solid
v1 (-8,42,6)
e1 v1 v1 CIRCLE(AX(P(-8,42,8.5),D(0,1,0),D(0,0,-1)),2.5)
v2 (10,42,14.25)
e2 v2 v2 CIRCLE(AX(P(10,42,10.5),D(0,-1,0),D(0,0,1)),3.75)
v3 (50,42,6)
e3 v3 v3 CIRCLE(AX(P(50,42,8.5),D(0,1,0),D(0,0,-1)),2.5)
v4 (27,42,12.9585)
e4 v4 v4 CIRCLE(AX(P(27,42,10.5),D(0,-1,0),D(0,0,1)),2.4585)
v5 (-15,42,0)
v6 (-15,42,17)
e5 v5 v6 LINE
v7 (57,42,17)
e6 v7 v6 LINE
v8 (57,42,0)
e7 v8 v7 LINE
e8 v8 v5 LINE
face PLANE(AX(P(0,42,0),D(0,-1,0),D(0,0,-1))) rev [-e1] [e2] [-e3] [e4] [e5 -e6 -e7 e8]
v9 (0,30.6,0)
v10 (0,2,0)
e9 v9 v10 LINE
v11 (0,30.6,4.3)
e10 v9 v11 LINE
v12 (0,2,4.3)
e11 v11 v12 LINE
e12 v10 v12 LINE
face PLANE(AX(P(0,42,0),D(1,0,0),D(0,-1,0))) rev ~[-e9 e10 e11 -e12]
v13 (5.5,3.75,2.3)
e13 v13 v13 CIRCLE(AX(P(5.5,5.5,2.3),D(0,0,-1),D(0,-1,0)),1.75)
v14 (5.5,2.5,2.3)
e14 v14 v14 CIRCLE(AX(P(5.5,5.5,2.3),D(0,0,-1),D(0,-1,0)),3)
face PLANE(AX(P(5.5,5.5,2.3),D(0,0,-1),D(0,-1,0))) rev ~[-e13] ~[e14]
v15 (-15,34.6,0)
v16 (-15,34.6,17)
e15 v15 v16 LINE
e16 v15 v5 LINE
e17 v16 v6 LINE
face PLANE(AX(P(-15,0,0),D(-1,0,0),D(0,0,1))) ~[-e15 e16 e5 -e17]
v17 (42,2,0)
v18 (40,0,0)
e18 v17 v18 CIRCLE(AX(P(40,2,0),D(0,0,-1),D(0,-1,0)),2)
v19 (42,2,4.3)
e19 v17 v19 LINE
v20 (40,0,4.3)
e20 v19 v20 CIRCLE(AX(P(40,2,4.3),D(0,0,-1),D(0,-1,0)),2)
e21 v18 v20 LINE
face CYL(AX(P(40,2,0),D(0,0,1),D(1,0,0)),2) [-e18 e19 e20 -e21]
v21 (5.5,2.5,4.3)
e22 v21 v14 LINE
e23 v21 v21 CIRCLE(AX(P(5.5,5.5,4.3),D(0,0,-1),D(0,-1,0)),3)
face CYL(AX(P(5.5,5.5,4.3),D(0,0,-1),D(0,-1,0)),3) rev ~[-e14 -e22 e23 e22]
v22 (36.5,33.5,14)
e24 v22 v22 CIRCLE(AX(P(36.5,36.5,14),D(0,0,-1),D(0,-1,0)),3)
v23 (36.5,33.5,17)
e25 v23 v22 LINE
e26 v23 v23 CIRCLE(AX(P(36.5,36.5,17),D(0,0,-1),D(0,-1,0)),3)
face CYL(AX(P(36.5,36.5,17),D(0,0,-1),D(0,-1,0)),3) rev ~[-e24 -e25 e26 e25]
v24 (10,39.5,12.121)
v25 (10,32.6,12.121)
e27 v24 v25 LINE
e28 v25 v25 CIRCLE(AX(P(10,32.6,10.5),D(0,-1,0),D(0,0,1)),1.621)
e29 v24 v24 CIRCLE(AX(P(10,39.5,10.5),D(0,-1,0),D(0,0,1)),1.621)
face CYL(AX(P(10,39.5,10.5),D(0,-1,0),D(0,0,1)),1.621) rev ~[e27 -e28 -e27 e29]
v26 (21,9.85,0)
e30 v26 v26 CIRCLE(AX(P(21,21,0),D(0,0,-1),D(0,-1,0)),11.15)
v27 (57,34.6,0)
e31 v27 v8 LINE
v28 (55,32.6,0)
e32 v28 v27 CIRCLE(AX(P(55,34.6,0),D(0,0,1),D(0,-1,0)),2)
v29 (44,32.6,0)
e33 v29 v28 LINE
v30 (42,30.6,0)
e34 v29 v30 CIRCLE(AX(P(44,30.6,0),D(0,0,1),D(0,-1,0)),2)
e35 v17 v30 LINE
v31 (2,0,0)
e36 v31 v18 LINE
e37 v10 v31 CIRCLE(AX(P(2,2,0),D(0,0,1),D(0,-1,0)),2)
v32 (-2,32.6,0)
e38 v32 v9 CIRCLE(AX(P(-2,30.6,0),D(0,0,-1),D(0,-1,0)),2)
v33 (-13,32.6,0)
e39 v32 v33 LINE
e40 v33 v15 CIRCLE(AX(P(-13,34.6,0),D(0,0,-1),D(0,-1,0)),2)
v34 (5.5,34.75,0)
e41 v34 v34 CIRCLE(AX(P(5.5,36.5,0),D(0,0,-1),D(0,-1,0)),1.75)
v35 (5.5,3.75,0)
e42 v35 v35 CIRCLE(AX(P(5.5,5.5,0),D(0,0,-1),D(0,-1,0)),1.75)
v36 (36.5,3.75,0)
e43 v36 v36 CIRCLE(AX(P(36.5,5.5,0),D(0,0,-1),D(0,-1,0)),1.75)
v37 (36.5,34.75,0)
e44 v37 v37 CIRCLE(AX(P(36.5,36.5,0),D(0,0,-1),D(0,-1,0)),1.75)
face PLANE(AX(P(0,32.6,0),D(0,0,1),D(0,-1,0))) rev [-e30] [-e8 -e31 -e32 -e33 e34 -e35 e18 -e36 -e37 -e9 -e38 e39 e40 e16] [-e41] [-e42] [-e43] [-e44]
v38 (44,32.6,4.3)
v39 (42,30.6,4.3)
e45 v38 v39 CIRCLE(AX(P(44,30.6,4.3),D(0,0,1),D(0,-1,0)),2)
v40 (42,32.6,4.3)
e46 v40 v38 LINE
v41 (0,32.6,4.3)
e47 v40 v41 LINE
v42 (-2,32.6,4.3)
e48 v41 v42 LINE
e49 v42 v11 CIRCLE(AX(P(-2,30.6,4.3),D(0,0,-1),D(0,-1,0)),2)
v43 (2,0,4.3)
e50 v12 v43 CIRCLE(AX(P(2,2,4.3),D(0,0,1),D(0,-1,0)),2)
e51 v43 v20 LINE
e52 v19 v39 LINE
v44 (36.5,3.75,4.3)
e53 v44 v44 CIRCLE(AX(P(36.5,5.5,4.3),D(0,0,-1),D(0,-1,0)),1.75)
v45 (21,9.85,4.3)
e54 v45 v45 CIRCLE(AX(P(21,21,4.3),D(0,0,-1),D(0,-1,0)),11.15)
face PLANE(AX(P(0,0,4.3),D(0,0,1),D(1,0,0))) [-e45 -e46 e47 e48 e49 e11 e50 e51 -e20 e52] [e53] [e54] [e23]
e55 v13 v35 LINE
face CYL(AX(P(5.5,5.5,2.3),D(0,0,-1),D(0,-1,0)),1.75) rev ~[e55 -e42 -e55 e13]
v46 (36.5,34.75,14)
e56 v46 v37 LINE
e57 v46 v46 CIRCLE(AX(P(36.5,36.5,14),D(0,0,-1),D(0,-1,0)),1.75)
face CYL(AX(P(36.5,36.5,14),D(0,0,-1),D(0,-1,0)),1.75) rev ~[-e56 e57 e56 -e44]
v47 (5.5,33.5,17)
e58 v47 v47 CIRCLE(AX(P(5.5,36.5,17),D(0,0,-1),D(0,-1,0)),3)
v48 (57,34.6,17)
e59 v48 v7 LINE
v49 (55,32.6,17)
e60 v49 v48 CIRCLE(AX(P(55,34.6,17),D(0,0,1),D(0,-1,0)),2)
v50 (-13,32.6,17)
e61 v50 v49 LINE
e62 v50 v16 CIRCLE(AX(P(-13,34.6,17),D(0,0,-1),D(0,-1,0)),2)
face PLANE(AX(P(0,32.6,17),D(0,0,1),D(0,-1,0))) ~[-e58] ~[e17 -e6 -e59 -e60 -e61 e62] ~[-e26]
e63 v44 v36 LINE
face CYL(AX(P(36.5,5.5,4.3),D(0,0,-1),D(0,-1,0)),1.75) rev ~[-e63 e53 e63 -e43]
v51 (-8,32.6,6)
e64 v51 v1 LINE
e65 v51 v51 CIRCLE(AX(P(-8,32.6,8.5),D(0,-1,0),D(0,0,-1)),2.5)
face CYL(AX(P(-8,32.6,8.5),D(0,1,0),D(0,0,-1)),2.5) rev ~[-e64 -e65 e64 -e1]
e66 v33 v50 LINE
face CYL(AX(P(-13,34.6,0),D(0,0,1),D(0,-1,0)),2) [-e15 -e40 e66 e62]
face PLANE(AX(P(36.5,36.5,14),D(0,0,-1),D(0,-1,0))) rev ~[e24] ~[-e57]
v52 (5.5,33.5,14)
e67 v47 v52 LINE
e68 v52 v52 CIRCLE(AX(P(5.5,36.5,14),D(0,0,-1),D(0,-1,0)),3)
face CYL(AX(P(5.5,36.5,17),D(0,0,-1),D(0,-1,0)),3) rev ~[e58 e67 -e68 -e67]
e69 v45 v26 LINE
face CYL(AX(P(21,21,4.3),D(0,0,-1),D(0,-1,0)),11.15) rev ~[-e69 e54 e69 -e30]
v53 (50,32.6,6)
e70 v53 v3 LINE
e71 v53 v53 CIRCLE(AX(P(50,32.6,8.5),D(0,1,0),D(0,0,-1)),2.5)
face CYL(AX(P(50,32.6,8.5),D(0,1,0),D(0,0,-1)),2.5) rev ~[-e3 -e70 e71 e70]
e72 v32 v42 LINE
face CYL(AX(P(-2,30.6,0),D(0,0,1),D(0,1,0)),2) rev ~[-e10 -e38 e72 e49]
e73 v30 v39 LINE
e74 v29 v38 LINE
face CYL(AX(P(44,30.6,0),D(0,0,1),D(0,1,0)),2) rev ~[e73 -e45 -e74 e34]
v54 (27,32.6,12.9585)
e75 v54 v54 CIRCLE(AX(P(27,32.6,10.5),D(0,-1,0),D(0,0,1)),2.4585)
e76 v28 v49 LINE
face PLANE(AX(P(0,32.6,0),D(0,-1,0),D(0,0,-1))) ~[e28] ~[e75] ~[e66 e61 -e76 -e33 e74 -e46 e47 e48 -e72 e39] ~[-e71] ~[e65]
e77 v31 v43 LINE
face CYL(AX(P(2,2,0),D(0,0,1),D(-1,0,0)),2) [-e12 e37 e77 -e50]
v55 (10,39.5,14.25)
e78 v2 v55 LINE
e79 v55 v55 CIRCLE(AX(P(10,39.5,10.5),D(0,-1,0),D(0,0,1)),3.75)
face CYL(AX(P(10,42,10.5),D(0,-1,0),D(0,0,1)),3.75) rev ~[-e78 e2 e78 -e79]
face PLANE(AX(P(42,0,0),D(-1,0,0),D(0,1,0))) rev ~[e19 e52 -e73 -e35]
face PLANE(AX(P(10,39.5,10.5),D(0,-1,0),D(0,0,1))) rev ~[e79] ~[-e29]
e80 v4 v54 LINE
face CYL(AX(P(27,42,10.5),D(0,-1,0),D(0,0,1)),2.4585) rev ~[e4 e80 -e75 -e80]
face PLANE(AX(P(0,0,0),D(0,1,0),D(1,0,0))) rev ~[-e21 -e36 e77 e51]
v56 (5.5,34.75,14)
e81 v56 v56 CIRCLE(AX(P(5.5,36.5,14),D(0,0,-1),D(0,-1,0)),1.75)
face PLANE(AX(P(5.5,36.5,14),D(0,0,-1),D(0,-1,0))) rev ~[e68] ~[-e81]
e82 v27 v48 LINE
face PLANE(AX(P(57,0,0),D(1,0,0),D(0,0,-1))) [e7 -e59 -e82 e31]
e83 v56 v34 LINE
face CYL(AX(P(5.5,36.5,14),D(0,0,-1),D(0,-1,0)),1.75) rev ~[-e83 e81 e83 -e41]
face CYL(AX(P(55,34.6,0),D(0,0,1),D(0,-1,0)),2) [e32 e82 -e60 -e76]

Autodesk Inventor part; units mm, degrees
ref_plane "YZ Plane" through (0, 0, 0) normal (1, 0, 0) x (0, 1, 0)
ref_plane "XZ Plane" through (0, 0, 0) normal (0, 1, 0) x (-1, 0, 0)
sketch "Sketch1" plane through (0, 0, 0) normal (0, 0, 1) x (1, 0, 0)
  line L0 (0, 0) -> (42, 0)
  line L1 (42, 0) -> (42, 42)
  line L2 (42, 42) -> (0, 42)
  line L3 (0, 42) -> (0, 0)
  dimension "d0" = 42
  dimension "d1" = 42
extrude "Extrusion1" add sketch "Sketch1" along normal blind 4.3
sketch "Sketch2" plane through (0, 0, 4.3) normal (0, 0, 1) x (1, 0, 0)
  line L0 (0, 42) -> (0, 0) projected
  line L1 (42, 0) -> (42, 42) projected
  line L2 (0, 42) -> (42, 42)
  line L3 (42, 42) -> (42, 32.6)
  line L4 (42, 32.6) -> (0, 32.6)
  line L5 (0, 32.6) -> (0, 42)
  dimension "d4" = 9.4
extrude "Extrusion2" add sketch "Sketch2" along normal blind 12.7
sketch "Sketch3" plane through (0, 0, 4.3) normal (0, 0, 1) x (1, 0, 0)
  line L0 (0, 32.6) -> (0, 0) projected
  line L1 (0, 0) -> (42, 0) projected
  point P0 (21, 21)
  dimension "d7" = 21
  dimension "d8" = 21
hole "Hole1" at (21, 21, 4.3) direction (0, 0, -1) diameter 22.3 end through all
sketch "Sketch4" plane through (0, 0, 17) normal (0, 0, 1) x (1, 0, 0)
  line L0 (42, 42) -> (0, 42) projected
  line L1 (0, 42) -> (0, 32.6) projected
  line L2 (42, 32.6) -> (42, 42) projected
  line L3 (0, 0) -> (42, 0) projected
  point P0 (5.5, 36.5)
  point P1 (36.5, 36.5)
  dimension "d16" = 5.5
  dimension "d17" = 5.5
  dimension "d18" = 5.5
  dimension "d21" = 5.5
hole "Hole2" at (5.5, 36.5, 17) at (36.5, 36.5, 17) direction (0, 0, -1) diameter 3.5 end through all counterbore diameter 6 counterbore depth 3
sketch "Sketch5" plane through (0, 0, 4.3) normal (0, 0, 1) x (1, 0, 0)
  line L0 (0, 0) -> (42, 0) projected
  line L1 (0, 32.6) -> (0, 0) projected
  point P0 (5.5, 5.5)
  dimension "d31" = 5.5
  dimension "d32" = 5.5
hole "Hole3" at (5.5, 5.5, 4.3) direction (0, 0, -1) diameter 3.5 end through all counterbore diameter 6 counterbore depth 2
sketch "Sketch6" plane through (0, 0, 4.3) normal (0, 0, 1) x (1, 0, 0)
  line L0 (42, 0) -> (42, 32.6) projected
  line L1 (0, 0) -> (42, 0) projected
  point P0 (36.5, 5.5)
  dimension "d40" = 5.5
  dimension "d41" = 5.5
hole "Hole4" at (36.5, 5.5, 4.3) direction (0, 0, -1) diameter 3.5 end through all
sketch "Sketch7" plane through (0, 42, 0) normal (0, 1, 0) x (1, 0, 0)
  line L0 (0, -17) -> (42, -17) projected
  line L1 (42, 0) -> (42, -17) projected
  point P0 (0, 0)
  point P1 (27, -10.5)
  dimension "d49" = 6.5
  dimension "d50" = 15
hole "Hole5" at (27, 42, 10.5) direction (0, -1, 0) diameter 4.917 end through all thread size "M6x1" class "6H" standard "ISO Metric profile"
sketch "Sketch8" plane through (0, 42, 0) normal (0, 1, 0) x (1, 0, 0)
  line L0 (42, -17) -> (0, -17) projected
  line L1 (0, -4.3) -> (0, -17) projected
  point P0 (0, 0)
  point P1 (10, -10.5)
  dimension "d58" = 6.5
  dimension "d59" = 10
hole "Hole6" at (10, 42, 10.5) direction (0, -1, 0) diameter 3.242 end through all counterbore diameter 7.5 counterbore depth 2.5 thread size "M4x0.7" class "6H" standard "ISO Metric profile"
sketch "Sketch9" plane through (42, 0, 0) normal (1, 0, 0) x (0, 0, -1)
  line L0 (-17, 32.6) -> (-17, 42) projected
  line L1 (0, 32.6) -> (-17, 32.6)
  line L2 (0, 42) -> (-17, 42) projected
  line L3 (0, 0) -> (0, 42)
extrude "Extrusion3" add sketch "Sketch9" along normal blind 15
sketch "Sketch10" plane through (0, 32.6, 4.3) normal (0, -1, 0) x (1, 0, 0)
  circle A0 centre (50, 4.2) radius 2.5
  line L0 (0, 12.7) -> (57, 12.7) projected
  line L1 (57, 12.7) -> (57, -4.3) projected
  point P0 (0, -4.3)
  dimension "d70" = 5
  dimension "d71" = 8.5
  dimension "d72" = 17
  dimension "d73" = 7
hole "Hole7" at (50, 32.6, 8.5) direction (0, 1, 0) diameter 5 end through all
ref_plane "Work Plane1" through (21, 0, 4.3) normal (1, 0, 0) x (0, 0, -1)
mirror "Mirror1" about plane through (21, 0, 4.3) normal (1, 0, 0) of "Hole7", "Extrusion3"
fillet "Fillet2" radius 2 6 edges at (-15, 32.6, 8.5) (0, 32.6, 2.15) (0, 0, 2.15) (42, 0, 2.15) (42, 32.6, 2.15) (57, 32.6, 8.5)
sketch "Sketch11" plane through (0, 0, 4.3) normal (0, 0, 1) x (1, 0, 0)
  line L0 (-6.1242, 27.6) -> (48.7334, 27.6)
  line L1 (55, 32.6) -> (-13, 32.6)
  line L2 (0, 27.6) -> (0, 2)
  arc A0 (0, 2) -> (2, 0) centre (2, 2) ccw
  line L3 (2, 0) -> (40, 0)
  arc A1 (40, 0) -> (42, 2) centre (40, 2) ccw
  line L4 (42, 2) -> (42, 27.6)
  point P0 (0, 0)
  dimension "d82" = 5
equation "\"d71\" = 0.5 * d72"
